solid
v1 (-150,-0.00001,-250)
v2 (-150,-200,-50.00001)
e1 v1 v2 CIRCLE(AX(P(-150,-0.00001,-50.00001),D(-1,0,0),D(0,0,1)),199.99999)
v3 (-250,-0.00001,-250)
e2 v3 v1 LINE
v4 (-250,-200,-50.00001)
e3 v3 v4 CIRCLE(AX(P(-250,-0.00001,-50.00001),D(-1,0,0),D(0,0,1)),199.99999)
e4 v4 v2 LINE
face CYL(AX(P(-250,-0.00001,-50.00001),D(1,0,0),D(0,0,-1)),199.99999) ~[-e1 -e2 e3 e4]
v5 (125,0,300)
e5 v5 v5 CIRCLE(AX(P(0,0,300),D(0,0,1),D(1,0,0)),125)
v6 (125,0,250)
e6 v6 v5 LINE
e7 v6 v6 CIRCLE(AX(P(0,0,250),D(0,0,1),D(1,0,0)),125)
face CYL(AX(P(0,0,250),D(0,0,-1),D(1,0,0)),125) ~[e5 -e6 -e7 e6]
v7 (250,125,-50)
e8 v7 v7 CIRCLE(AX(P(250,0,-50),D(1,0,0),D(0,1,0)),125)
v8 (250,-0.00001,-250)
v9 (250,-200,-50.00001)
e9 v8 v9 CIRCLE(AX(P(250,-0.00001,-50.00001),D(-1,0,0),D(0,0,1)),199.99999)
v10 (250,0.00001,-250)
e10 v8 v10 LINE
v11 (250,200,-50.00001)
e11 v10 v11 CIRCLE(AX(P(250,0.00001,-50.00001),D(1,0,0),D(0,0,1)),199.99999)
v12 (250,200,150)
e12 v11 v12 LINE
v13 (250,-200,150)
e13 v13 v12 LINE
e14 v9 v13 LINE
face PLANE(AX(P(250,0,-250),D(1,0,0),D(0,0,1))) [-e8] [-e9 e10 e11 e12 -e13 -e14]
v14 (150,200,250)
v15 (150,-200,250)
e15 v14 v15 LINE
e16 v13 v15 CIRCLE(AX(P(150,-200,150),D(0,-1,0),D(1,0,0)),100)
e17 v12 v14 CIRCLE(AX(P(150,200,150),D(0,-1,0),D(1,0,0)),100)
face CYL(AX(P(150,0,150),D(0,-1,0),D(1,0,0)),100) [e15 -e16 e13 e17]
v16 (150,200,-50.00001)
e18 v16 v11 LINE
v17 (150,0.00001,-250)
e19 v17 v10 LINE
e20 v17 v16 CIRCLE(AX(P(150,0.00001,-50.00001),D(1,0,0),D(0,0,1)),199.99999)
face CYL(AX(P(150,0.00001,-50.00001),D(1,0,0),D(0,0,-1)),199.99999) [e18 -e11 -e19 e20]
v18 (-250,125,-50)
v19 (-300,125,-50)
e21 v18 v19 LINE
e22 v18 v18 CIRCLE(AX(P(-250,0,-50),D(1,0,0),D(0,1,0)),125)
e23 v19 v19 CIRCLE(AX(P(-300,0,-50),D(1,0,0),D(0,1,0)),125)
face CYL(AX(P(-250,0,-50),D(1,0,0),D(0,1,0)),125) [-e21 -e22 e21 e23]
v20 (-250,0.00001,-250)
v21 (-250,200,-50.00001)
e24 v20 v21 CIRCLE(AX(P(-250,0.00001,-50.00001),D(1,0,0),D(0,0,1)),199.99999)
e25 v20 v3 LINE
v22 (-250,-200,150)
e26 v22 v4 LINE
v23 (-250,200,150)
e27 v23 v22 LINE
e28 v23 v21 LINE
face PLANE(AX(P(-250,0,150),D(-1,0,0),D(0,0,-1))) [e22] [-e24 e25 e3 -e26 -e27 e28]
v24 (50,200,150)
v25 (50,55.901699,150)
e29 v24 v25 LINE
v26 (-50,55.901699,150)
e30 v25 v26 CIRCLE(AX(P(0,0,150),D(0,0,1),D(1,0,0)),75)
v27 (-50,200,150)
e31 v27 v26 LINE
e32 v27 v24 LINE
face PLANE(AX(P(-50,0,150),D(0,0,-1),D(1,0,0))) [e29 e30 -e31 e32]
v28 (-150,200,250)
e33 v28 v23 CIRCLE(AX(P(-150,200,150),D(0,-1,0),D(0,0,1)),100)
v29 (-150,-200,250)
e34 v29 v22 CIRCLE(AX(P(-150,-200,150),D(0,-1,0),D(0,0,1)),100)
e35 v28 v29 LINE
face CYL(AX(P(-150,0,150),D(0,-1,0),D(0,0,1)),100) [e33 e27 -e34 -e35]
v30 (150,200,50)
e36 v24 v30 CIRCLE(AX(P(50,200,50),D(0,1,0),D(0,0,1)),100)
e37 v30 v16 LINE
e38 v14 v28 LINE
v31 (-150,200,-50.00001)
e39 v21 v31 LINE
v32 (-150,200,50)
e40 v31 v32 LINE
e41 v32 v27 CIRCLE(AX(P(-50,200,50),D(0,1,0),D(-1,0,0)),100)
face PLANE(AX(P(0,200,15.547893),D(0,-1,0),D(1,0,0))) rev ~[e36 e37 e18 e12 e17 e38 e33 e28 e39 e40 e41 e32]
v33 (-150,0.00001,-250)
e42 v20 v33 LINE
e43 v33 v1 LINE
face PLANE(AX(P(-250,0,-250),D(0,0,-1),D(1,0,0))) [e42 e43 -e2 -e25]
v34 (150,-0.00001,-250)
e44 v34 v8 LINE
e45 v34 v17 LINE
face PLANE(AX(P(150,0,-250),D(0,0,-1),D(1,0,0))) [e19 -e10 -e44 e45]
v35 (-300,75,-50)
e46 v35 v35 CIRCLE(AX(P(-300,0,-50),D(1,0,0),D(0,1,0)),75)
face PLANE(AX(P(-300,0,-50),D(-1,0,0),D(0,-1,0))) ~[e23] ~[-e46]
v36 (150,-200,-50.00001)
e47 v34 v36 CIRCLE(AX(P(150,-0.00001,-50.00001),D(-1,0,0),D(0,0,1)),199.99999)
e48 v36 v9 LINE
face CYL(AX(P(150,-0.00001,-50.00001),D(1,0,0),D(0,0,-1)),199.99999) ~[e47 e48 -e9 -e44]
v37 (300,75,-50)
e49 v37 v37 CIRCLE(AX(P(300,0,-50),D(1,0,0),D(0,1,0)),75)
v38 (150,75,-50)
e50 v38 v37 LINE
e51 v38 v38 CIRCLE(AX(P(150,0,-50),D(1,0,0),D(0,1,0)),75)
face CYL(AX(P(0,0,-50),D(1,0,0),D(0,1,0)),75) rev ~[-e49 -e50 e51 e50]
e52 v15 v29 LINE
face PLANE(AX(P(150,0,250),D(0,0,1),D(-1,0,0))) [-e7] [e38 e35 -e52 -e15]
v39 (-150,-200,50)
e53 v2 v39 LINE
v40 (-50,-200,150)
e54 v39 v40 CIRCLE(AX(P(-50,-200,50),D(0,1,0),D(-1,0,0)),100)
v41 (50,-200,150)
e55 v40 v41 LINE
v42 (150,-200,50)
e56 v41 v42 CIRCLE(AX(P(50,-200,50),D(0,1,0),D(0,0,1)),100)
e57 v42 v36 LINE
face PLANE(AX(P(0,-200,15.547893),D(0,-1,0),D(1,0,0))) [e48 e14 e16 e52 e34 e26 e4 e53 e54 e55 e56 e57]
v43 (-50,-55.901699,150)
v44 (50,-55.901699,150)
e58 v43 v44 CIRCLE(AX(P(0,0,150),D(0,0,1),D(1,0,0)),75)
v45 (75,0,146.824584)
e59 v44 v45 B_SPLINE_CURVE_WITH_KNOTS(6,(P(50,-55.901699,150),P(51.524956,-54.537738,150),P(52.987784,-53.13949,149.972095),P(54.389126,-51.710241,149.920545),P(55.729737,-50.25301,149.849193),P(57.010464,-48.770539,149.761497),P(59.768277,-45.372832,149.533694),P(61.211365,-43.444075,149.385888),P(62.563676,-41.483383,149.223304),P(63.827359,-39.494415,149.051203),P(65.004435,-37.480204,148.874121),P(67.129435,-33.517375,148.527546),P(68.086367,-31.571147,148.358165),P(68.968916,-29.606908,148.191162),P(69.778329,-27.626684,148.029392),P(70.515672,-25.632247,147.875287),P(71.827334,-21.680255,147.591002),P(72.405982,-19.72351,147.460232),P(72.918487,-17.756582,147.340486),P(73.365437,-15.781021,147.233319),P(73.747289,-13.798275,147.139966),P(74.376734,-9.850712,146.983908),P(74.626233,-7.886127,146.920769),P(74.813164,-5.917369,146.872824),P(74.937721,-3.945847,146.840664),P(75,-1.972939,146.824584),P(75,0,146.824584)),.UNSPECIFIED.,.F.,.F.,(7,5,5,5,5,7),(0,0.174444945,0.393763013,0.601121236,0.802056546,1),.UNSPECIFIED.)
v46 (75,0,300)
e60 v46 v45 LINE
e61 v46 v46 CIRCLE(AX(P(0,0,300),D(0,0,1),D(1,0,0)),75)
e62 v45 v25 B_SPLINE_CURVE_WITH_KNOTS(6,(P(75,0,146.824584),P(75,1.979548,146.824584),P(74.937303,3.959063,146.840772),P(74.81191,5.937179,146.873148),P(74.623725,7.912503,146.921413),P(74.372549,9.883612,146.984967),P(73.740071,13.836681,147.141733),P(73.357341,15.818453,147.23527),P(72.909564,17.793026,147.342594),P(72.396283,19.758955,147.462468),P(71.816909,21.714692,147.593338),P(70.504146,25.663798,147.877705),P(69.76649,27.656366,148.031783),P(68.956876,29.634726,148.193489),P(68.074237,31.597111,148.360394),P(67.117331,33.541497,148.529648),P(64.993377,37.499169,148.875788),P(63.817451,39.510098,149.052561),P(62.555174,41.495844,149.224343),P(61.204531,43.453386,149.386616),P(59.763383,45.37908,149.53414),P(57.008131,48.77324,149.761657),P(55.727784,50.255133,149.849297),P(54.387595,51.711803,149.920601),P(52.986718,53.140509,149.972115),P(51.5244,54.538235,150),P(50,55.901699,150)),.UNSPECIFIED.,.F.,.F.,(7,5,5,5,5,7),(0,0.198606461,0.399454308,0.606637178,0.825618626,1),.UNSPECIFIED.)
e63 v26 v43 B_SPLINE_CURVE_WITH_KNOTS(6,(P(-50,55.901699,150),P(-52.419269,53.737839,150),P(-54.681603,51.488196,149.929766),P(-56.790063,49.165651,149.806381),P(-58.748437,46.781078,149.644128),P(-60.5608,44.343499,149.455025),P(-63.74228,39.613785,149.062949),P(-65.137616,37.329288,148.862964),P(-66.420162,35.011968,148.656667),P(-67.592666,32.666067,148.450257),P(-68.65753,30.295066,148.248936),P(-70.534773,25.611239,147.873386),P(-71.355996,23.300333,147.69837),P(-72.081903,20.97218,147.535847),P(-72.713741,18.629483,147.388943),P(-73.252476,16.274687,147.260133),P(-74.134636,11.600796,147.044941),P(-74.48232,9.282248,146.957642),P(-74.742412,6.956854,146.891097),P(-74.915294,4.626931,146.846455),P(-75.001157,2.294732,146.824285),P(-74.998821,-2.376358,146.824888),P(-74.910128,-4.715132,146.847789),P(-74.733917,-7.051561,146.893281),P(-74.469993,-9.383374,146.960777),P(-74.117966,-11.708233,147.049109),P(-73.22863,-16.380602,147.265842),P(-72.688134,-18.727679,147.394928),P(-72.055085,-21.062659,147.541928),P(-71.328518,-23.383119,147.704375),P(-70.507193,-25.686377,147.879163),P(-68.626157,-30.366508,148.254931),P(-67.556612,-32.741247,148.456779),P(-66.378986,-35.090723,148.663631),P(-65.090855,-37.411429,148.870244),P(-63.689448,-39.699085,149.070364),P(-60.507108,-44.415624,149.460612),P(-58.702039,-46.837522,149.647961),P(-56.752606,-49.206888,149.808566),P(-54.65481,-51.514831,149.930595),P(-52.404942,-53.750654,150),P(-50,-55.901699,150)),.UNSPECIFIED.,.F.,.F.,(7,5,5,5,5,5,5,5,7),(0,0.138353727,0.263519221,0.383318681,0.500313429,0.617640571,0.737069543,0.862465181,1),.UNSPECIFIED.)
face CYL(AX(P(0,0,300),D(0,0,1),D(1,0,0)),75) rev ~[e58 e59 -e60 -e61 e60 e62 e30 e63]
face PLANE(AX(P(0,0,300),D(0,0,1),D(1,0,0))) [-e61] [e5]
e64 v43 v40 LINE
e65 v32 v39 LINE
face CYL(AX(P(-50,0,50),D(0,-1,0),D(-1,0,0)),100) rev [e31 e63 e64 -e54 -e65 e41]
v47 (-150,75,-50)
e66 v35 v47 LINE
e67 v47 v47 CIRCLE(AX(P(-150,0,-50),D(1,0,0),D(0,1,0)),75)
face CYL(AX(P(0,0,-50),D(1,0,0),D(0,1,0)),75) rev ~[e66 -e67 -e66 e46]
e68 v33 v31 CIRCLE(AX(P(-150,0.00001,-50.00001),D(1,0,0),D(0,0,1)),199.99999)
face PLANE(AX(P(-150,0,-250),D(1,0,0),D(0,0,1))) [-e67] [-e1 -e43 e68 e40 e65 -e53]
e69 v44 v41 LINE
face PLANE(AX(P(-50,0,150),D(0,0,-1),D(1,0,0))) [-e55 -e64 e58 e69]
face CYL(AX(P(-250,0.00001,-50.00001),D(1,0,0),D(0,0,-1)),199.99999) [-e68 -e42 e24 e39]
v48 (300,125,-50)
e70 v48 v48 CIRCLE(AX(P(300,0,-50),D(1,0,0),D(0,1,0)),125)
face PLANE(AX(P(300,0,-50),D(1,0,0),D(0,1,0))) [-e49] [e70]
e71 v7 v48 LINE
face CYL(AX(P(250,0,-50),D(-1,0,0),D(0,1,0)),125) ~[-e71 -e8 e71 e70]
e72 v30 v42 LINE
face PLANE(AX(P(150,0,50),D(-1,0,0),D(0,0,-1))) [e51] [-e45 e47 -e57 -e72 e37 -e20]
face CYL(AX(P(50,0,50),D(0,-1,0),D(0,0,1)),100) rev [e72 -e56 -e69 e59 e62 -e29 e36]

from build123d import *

# Parameters (mm, degrees)
F1_DEPTH  = 200
F2_R      = 199.99999
F3_R      = 125
F4_DEPTH  = 50
F5_R      = 125
F6_DEPTH  = 50
F7_R      = 75
F8_DEPTH  = 350
F9_R      = 75
F10_DEPTH = 312.5


# Not quite as in the source:
# - a fillet or chamfer is up to 0.001 mm smaller than in the source, because OpenCascade refuses the exact size
# - a pattern or mirror of a feature is missing from the dataset's text; its kind, count and spacing are read off the source's solid


with BuildPart() as f1:
    # F0 (on Front) → F1 (new body, symmetric)
    with BuildSketch(Plane.XZ):
        with BuildLine():
            ThreePointArc((250, 150), (220.7106781187, 220.7106781187), (150, 250))
            Line((150, 250), (-150, 250))
            ThreePointArc((-150, 250), (-220.7106781187, 220.7106781187), (-250, 150))
            Line((-250, 150), (-250, -250))
            Line((-250, -250), (-150, -250))
            Line((-150, -250), (-150, 50))
            ThreePointArc((-150, 50), (-120.7106781187, 120.7106781187), (-50, 150))
            Line((-50, 150), (50, 150))
            ThreePointArc((50, 150), (120.7106781187, 120.7106781187), (150, 50))
            Line((150, 50), (150, -250))
            Line((150, -250), (250, -250))
            Line((250, -250), (250, 150))
        make_face()
    extrude(amount=F1_DEPTH, both=True)

    # F2 (radius 200 in the source; OpenCascade refuses exactly that, so slightly less here)
    f2_edges = [f1.edges().sort_by_distance(p)[0] for p in [
        (-200, -200, -250),
        (-200, 200, -250),
        (200, -200, -250),
        (200, 200, -250),
    ]]
    fillet(f2_edges, radius=F2_R)

    # F3 (on face) → F4 (join)
    with BuildSketch(Plane.YZ.offset(250)):
        with Locations((0, -50)):
            Circle(F3_R)
    f4 = extrude(amount=F4_DEPTH)

    # F4_copies: F4 across plane
    add(f4.mirror(Plane(origin=(0, 0, 0), x_dir=(0, 0, -1), z_dir=(-1, 0, 0))))

    # F5 (on face) → F6 (join)
    with BuildSketch(Plane.XY.offset(250)):
        Circle(F5_R)
    extrude(amount=F6_DEPTH)

    # F7 (on Right) → F8 (cut, symmetric)
    with BuildSketch(Plane.YZ):
        with Locations((0, -50)):
            Circle(F7_R)
    extrude(amount=F8_DEPTH, both=True, mode=Mode.SUBTRACT)

    # F9 (on face) → F10 (cut)
    with BuildSketch(Plane.XY.offset(300)):
        Circle(F9_R)
    extrude(amount=-F10_DEPTH, mode=Mode.SUBTRACT)


solid = f1.part
